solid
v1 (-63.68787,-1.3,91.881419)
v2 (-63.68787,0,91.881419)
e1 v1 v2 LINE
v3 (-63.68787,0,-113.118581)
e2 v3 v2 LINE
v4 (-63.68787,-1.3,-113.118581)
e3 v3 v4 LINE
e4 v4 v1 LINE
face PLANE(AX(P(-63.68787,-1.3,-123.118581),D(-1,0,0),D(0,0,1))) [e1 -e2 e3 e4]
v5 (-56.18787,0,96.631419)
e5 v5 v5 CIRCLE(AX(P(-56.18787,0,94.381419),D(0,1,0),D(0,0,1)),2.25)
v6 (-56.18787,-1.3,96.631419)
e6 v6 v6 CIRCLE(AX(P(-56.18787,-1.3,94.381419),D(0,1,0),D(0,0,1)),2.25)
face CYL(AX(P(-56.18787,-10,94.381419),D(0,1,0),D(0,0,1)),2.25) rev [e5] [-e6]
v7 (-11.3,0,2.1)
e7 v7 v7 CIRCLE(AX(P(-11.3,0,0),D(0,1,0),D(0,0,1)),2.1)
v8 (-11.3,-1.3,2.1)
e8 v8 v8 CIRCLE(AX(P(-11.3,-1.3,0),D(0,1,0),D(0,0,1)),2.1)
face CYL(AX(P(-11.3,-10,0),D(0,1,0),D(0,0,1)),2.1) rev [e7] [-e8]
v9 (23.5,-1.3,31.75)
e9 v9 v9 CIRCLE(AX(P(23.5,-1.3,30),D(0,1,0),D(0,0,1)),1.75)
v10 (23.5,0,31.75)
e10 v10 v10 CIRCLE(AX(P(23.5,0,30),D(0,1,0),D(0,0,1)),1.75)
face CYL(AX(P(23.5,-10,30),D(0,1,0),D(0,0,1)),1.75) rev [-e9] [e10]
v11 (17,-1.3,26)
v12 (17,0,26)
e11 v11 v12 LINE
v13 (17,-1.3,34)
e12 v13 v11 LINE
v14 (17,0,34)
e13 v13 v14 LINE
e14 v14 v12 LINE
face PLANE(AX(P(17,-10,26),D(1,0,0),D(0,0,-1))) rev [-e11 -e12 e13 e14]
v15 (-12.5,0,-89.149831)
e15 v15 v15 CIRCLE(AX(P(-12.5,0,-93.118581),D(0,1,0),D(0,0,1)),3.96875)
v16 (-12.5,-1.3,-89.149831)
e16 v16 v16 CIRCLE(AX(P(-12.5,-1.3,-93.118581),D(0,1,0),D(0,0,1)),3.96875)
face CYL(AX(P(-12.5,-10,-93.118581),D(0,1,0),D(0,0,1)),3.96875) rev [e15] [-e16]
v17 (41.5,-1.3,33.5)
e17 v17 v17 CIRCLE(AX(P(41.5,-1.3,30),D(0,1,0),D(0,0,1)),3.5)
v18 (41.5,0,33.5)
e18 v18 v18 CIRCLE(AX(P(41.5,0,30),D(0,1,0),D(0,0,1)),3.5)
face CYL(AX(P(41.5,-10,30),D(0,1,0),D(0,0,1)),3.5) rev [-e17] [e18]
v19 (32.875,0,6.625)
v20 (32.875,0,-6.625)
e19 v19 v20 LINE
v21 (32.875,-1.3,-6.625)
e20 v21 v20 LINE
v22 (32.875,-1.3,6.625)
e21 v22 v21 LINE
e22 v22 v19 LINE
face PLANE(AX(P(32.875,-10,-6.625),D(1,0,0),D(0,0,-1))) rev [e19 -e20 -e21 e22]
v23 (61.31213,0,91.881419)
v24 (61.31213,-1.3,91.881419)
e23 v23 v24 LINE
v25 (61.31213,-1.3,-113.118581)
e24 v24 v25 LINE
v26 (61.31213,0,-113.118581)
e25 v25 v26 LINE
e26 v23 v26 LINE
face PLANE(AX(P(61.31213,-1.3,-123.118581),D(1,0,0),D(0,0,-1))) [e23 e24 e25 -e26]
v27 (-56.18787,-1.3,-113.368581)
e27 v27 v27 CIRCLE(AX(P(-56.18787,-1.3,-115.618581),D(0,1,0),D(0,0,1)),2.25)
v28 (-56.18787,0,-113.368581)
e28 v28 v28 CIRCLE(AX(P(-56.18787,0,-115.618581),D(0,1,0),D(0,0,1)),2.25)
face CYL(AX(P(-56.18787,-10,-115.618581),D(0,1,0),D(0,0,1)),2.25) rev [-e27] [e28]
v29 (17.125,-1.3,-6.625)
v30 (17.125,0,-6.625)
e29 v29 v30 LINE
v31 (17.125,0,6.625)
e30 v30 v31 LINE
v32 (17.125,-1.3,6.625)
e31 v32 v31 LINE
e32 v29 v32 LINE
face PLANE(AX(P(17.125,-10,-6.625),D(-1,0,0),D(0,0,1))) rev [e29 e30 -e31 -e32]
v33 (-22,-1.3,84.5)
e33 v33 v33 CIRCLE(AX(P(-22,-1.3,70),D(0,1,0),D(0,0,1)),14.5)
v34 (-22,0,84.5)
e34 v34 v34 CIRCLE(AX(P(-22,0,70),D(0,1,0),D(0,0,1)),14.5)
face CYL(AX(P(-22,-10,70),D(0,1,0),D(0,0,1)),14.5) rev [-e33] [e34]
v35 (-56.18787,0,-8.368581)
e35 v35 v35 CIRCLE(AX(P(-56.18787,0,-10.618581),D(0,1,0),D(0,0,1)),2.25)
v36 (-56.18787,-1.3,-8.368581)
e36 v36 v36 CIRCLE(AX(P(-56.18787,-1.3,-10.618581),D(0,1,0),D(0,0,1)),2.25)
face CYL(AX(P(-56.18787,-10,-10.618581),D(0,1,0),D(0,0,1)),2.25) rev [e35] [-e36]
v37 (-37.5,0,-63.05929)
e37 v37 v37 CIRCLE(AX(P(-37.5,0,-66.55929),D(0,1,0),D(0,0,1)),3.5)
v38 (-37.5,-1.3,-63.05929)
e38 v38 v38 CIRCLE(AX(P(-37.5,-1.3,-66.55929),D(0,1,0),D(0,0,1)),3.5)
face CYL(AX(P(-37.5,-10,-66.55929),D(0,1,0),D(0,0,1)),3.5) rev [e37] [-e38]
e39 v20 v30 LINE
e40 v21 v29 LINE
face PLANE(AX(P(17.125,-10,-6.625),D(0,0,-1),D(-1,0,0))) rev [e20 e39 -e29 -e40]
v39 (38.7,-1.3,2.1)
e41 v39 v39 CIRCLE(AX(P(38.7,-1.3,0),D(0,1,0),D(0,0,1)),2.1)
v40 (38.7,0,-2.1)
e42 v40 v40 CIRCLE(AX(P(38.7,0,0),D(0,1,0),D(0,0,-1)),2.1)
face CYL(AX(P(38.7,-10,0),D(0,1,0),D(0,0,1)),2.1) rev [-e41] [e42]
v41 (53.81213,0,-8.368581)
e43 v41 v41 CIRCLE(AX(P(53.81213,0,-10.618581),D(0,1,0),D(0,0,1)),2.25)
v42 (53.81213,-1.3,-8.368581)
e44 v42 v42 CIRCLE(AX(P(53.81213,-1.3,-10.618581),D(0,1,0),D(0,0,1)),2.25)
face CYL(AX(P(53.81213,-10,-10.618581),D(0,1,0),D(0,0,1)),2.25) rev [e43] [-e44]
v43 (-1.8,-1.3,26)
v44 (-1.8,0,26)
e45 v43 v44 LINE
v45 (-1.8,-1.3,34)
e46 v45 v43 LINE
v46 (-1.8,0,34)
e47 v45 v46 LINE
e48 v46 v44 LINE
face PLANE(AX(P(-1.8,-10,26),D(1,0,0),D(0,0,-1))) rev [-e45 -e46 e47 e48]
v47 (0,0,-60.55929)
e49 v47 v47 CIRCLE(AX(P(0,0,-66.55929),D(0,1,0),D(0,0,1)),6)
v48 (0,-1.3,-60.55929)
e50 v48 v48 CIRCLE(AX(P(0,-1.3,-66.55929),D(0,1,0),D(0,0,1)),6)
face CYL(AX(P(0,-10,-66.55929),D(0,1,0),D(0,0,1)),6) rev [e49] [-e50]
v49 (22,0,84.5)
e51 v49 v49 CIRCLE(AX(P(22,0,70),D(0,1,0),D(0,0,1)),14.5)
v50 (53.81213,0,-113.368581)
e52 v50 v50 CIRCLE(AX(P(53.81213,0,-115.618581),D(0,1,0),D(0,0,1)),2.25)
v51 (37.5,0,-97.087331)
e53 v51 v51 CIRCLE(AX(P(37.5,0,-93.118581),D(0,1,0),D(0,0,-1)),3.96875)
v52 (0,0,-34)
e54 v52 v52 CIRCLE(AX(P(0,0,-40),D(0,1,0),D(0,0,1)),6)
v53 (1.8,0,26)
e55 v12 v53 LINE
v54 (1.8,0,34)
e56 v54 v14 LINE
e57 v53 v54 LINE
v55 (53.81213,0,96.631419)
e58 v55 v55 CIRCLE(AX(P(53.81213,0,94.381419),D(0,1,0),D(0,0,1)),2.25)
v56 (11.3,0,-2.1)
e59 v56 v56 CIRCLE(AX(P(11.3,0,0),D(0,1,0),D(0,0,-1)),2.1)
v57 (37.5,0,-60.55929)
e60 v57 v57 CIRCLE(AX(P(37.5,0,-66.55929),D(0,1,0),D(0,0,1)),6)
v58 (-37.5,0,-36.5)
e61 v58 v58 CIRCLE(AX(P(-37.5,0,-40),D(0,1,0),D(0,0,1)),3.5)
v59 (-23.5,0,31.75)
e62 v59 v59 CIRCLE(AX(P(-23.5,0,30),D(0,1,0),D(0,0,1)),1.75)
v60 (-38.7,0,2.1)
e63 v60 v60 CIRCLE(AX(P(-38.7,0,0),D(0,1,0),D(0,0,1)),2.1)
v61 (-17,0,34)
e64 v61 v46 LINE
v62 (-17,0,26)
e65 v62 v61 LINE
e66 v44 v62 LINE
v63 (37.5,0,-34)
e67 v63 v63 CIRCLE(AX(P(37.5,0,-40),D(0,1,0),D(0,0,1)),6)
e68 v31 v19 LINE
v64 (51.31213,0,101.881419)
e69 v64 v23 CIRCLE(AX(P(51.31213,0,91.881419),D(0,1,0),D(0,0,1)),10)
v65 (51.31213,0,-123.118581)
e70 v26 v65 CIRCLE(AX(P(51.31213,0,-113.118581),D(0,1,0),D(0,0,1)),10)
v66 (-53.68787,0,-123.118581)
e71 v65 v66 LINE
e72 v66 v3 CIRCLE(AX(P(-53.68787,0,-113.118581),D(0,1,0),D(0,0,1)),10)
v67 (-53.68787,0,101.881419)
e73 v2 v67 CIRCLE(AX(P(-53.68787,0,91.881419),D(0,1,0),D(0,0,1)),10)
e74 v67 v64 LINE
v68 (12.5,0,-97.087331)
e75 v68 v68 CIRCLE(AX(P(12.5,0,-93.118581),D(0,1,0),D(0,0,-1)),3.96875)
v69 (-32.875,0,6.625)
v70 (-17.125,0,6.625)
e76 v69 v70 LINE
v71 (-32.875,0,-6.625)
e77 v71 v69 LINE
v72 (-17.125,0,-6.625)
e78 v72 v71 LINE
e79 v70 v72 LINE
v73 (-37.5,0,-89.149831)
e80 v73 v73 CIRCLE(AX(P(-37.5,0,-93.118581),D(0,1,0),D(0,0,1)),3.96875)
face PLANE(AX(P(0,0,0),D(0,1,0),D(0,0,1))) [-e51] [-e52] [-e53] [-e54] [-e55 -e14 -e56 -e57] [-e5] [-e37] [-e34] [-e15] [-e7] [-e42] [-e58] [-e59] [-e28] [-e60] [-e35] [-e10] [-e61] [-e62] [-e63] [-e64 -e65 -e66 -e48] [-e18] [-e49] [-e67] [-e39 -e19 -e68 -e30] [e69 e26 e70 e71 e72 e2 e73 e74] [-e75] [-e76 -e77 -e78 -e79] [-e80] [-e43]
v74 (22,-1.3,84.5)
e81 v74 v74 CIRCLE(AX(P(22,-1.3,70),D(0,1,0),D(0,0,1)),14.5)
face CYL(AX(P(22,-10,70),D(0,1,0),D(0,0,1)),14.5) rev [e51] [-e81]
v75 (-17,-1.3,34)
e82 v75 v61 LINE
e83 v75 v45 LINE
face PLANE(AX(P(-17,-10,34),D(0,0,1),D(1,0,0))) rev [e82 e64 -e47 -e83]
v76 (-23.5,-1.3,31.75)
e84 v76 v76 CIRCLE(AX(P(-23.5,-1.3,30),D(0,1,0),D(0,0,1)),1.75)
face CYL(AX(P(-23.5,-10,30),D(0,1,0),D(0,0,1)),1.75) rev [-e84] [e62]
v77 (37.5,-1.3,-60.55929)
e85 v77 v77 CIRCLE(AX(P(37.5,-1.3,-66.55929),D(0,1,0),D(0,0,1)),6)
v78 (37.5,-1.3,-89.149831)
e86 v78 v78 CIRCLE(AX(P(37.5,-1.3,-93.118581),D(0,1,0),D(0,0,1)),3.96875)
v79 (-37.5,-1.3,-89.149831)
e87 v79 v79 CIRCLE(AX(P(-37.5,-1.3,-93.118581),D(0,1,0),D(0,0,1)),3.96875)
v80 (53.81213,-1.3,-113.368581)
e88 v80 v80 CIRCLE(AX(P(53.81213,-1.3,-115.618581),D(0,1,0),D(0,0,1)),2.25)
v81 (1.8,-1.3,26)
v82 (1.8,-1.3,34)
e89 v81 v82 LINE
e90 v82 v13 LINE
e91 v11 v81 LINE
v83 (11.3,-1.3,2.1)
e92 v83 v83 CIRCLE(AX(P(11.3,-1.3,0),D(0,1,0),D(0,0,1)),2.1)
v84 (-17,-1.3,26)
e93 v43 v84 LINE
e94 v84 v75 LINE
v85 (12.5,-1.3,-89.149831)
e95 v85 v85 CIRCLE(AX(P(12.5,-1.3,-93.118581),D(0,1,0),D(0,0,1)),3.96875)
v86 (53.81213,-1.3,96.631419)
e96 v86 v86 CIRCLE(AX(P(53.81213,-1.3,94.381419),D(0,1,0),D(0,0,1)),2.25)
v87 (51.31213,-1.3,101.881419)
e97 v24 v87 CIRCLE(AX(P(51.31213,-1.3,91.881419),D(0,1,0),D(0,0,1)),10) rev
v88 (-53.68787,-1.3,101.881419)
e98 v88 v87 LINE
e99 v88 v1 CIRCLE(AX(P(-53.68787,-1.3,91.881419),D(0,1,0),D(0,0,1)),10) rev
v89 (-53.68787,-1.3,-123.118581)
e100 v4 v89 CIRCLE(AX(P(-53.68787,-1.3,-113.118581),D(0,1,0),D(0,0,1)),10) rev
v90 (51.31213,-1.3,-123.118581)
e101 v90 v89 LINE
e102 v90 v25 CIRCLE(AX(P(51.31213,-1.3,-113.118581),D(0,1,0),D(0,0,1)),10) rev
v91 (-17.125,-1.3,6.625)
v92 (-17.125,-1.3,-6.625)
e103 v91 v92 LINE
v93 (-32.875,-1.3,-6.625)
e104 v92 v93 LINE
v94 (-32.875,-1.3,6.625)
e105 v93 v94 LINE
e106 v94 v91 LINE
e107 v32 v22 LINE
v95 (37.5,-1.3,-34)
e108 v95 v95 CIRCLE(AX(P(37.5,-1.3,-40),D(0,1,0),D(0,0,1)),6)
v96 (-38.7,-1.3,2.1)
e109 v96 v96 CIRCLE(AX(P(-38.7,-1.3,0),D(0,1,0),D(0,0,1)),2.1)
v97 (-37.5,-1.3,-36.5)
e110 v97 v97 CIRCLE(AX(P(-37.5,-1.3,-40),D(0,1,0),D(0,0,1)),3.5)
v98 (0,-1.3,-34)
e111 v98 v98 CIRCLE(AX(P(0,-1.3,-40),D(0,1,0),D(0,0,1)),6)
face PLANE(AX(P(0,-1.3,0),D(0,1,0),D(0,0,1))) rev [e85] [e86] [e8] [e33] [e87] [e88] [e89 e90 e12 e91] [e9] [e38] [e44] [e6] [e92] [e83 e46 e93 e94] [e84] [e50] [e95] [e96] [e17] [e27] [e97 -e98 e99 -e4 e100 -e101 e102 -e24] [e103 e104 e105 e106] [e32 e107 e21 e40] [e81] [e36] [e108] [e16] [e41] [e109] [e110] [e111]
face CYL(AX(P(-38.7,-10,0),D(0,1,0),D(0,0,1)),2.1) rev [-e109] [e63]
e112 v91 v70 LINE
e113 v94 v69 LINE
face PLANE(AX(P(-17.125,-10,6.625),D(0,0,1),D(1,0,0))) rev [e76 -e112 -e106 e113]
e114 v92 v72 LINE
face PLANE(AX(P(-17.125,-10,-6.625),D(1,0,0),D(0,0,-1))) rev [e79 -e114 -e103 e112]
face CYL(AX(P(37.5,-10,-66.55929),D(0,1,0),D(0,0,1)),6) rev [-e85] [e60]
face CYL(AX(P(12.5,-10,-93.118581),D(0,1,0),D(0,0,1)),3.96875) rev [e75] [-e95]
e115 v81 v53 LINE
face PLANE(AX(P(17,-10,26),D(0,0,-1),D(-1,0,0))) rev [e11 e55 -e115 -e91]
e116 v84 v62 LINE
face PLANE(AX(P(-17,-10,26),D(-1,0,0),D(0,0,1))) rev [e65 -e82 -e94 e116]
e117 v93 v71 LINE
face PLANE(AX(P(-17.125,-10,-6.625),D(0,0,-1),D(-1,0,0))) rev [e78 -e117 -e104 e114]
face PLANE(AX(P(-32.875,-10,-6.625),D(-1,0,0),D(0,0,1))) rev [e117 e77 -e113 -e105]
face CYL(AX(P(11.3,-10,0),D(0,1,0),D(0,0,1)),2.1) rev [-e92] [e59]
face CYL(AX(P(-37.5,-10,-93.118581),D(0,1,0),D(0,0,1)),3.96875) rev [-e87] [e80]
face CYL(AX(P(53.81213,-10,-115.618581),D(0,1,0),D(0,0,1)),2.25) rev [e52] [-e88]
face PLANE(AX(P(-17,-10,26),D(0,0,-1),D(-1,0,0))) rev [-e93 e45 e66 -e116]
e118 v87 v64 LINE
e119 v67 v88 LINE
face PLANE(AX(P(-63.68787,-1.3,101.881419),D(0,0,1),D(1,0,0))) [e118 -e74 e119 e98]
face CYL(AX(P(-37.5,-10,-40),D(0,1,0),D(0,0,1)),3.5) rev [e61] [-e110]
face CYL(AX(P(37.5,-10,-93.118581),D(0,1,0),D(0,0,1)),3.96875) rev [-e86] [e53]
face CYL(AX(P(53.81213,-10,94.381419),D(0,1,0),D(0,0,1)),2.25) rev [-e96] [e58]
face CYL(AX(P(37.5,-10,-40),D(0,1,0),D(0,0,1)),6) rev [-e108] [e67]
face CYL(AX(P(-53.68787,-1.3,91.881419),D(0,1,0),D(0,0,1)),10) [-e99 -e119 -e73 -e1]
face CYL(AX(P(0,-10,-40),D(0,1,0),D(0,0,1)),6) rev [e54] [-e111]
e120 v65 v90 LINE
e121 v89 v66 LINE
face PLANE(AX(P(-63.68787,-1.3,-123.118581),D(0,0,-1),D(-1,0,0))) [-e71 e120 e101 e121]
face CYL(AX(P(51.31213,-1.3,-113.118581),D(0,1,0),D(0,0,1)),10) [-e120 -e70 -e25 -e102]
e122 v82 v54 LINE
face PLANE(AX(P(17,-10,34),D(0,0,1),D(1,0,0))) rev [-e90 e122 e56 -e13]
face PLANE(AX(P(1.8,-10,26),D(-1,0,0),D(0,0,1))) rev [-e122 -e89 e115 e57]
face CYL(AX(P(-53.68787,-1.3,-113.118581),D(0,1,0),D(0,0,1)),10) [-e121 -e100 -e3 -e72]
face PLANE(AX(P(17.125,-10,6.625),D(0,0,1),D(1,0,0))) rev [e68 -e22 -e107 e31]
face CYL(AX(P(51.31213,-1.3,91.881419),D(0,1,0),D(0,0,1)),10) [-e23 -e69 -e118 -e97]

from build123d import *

# Parameters (mm, degrees)
SKETCH1_W          = 125
SKETCH1_H          = 225
BASE_FLANGE1_DEPTH = 1.3
SKETCH6_R          = 2.25
CUT_EXTRUDE1_DEPTH = 10
FILLET1_R          = 10
SKETCH7_R          = 14.5
SKETCH7_R_2        = 1.75
SKETCH7_R_3        = 2.1
SKETCH7_R_4        = 3.96875
SKETCH7_W          = 15.2
SKETCH7_H          = 8
SKETCH7_W_2        = 15.75
SKETCH7_H_2        = 13.25
CUT_EXTRUDE2_DEPTH = 10
SKETCH8_R          = 3.5
CUT_EXTRUDE3_DEPTH = 10
SKETCH9_R          = 6
CUT_EXTRUDE4_DEPTH = 10


# Sheet-metal steps are written as plain solids
with BuildPart() as part:
    # Sketch1 → Base-Flange1 (new body)
    with BuildSketch(Plane(origin=(0, 0, 0), x_dir=(1, 0, 0), z_dir=(0, 1, 0))):
        with Locations((-1.187869711, 10.618580575)):
            Rectangle(SKETCH1_W, SKETCH1_H)
    extrude(amount=-BASE_FLANGE1_DEPTH)

    # Sketch6 → Cut-Extrude1 (cut)
    with BuildSketch(Plane(origin=(0, 0, 0), x_dir=(1, 0, 0), z_dir=(0, 1, 0))):
        with Locations(Location((53.812130289, 115.618580576, 0), (0, 0, 270))):
            Circle(SKETCH6_R)
        with Locations(Location((53.812130289, -94.381419424, 0), (0, 0, 270))):
            Circle(SKETCH6_R)
        with Locations(Location((-56.187869711, -94.381419424, 0), (0, 0, 270))):
            Circle(SKETCH6_R)
        with Locations(Location((-56.187869711, 115.618580576, 0), (0, 0, 270))):
            Circle(SKETCH6_R)
        with Locations(Location((53.812130289, 10.618580576, 0), (0, 0, 270))):
            Circle(SKETCH6_R)
        with Locations(Location((-56.187869711, 10.618580576, 0), (0, 0, 270))):
            Circle(SKETCH6_R)
    extrude(amount=-CUT_EXTRUDE1_DEPTH, mode=Mode.SUBTRACT)

    # Fillet1
    fillet1_edges = [part.edges().sort_by_distance(p)[0] for p in [
        (61.312130289, -0.65, 101.881419425),
        (-63.687869711, -0.65, 101.881419425),
        (-63.687869711, -0.65, -123.118580575),
        (61.312130289, -0.65, -123.118580575),
    ]]
    fillet(fillet1_edges, radius=FILLET1_R)

    # Sketch7 → Cut-Extrude2 (cut)
    with BuildSketch(Plane(origin=(0, 0, 0), x_dir=(1, 0, 0), z_dir=(0, 1, 0))):
        with Locations(Location((22, -70, 0), (0, 0, 270))):
            Circle(SKETCH7_R)
        with Locations(Location((-22, -70, 0), (0, 0, 270))):
            Circle(SKETCH7_R)
        with Locations(Location((23.5, -30, 0), (0, 0, 270))):
            Circle(SKETCH7_R_2)
        with Locations(Location((-23.5, -30, 0), (0, 0, 270))):
            Circle(SKETCH7_R_2)
        with Locations(Location((11.3, 0, 0), (0, 0, 270))):
            Circle(SKETCH7_R_3)
        with Locations(Location((38.7, 0, 0), (0, 0, 270))):
            Circle(SKETCH7_R_3)
        with Locations(Location((-12.5, 93.118580575, 0), (0, 0, 270))):
            Circle(SKETCH7_R_4)
        with Locations(Location((-37.5, 93.118580575, 0), (0, 0, 270))):
            Circle(SKETCH7_R_4)
        with Locations(Location((-38.7, 0, 0), (0, 0, 270))):
            Circle(SKETCH7_R_3)
        with Locations(Location((-11.3, 0, 0), (0, 0, 270))):
            Circle(SKETCH7_R_3)
        with Locations(Location((37.5, 93.118580575, 0), (0, 0, 270))):
            Circle(SKETCH7_R_4)
        with Locations(Location((12.5, 93.118580575, 0), (0, 0, 270))):
            Circle(SKETCH7_R_4)
        with Locations((9.4, -30)):
            Rectangle(SKETCH7_W, SKETCH7_H)
        with Locations((-9.4, -30)):
            Rectangle(SKETCH7_W, SKETCH7_H)
        with Locations((25, 0)):
            Rectangle(SKETCH7_W_2, SKETCH7_H_2)
        with Locations((-25, 0)):
            Rectangle(SKETCH7_W_2, SKETCH7_H_2)
    extrude(amount=-CUT_EXTRUDE2_DEPTH, mode=Mode.SUBTRACT)

    # Sketch8 → Cut-Extrude3 (cut)
    with BuildSketch(Plane(origin=(0, 0, 0), x_dir=(1, 0, 0), z_dir=(0, 1, 0))):
        with Locations(Location((-37.5, 66.559290288, 0), (0, 0, 270))):
            Circle(SKETCH8_R)
        with Locations(Location((-37.5, 40, 0), (0, 0, 270))):
            Circle(SKETCH8_R)
        with Locations(Location((41.5, -30, 0), (0, 0, 270))):
            Circle(SKETCH8_R)
    extrude(amount=-CUT_EXTRUDE3_DEPTH, mode=Mode.SUBTRACT)

    # Sketch9 → Cut-Extrude4 (cut)
    with BuildSketch(Plane(origin=(0, 0, 0), x_dir=(1, 0, 0), z_dir=(0, 1, 0))):
        with Locations(Location((37.5, 40, 0), (0, 0, 270))):
            Circle(SKETCH9_R)
        with Locations(Location((37.5, 66.559290288, 0), (0, 0, 270))):
            Circle(SKETCH9_R)
        with Locations(Location((0, 66.559290288, 0), (0, 0, 270))):
            Circle(SKETCH9_R)
        with Locations(Location((0, 40, 0), (0, 0, 270))):
            Circle(SKETCH9_R)
    extrude(amount=-CUT_EXTRUDE4_DEPTH, mode=Mode.SUBTRACT)


solid = part.part
